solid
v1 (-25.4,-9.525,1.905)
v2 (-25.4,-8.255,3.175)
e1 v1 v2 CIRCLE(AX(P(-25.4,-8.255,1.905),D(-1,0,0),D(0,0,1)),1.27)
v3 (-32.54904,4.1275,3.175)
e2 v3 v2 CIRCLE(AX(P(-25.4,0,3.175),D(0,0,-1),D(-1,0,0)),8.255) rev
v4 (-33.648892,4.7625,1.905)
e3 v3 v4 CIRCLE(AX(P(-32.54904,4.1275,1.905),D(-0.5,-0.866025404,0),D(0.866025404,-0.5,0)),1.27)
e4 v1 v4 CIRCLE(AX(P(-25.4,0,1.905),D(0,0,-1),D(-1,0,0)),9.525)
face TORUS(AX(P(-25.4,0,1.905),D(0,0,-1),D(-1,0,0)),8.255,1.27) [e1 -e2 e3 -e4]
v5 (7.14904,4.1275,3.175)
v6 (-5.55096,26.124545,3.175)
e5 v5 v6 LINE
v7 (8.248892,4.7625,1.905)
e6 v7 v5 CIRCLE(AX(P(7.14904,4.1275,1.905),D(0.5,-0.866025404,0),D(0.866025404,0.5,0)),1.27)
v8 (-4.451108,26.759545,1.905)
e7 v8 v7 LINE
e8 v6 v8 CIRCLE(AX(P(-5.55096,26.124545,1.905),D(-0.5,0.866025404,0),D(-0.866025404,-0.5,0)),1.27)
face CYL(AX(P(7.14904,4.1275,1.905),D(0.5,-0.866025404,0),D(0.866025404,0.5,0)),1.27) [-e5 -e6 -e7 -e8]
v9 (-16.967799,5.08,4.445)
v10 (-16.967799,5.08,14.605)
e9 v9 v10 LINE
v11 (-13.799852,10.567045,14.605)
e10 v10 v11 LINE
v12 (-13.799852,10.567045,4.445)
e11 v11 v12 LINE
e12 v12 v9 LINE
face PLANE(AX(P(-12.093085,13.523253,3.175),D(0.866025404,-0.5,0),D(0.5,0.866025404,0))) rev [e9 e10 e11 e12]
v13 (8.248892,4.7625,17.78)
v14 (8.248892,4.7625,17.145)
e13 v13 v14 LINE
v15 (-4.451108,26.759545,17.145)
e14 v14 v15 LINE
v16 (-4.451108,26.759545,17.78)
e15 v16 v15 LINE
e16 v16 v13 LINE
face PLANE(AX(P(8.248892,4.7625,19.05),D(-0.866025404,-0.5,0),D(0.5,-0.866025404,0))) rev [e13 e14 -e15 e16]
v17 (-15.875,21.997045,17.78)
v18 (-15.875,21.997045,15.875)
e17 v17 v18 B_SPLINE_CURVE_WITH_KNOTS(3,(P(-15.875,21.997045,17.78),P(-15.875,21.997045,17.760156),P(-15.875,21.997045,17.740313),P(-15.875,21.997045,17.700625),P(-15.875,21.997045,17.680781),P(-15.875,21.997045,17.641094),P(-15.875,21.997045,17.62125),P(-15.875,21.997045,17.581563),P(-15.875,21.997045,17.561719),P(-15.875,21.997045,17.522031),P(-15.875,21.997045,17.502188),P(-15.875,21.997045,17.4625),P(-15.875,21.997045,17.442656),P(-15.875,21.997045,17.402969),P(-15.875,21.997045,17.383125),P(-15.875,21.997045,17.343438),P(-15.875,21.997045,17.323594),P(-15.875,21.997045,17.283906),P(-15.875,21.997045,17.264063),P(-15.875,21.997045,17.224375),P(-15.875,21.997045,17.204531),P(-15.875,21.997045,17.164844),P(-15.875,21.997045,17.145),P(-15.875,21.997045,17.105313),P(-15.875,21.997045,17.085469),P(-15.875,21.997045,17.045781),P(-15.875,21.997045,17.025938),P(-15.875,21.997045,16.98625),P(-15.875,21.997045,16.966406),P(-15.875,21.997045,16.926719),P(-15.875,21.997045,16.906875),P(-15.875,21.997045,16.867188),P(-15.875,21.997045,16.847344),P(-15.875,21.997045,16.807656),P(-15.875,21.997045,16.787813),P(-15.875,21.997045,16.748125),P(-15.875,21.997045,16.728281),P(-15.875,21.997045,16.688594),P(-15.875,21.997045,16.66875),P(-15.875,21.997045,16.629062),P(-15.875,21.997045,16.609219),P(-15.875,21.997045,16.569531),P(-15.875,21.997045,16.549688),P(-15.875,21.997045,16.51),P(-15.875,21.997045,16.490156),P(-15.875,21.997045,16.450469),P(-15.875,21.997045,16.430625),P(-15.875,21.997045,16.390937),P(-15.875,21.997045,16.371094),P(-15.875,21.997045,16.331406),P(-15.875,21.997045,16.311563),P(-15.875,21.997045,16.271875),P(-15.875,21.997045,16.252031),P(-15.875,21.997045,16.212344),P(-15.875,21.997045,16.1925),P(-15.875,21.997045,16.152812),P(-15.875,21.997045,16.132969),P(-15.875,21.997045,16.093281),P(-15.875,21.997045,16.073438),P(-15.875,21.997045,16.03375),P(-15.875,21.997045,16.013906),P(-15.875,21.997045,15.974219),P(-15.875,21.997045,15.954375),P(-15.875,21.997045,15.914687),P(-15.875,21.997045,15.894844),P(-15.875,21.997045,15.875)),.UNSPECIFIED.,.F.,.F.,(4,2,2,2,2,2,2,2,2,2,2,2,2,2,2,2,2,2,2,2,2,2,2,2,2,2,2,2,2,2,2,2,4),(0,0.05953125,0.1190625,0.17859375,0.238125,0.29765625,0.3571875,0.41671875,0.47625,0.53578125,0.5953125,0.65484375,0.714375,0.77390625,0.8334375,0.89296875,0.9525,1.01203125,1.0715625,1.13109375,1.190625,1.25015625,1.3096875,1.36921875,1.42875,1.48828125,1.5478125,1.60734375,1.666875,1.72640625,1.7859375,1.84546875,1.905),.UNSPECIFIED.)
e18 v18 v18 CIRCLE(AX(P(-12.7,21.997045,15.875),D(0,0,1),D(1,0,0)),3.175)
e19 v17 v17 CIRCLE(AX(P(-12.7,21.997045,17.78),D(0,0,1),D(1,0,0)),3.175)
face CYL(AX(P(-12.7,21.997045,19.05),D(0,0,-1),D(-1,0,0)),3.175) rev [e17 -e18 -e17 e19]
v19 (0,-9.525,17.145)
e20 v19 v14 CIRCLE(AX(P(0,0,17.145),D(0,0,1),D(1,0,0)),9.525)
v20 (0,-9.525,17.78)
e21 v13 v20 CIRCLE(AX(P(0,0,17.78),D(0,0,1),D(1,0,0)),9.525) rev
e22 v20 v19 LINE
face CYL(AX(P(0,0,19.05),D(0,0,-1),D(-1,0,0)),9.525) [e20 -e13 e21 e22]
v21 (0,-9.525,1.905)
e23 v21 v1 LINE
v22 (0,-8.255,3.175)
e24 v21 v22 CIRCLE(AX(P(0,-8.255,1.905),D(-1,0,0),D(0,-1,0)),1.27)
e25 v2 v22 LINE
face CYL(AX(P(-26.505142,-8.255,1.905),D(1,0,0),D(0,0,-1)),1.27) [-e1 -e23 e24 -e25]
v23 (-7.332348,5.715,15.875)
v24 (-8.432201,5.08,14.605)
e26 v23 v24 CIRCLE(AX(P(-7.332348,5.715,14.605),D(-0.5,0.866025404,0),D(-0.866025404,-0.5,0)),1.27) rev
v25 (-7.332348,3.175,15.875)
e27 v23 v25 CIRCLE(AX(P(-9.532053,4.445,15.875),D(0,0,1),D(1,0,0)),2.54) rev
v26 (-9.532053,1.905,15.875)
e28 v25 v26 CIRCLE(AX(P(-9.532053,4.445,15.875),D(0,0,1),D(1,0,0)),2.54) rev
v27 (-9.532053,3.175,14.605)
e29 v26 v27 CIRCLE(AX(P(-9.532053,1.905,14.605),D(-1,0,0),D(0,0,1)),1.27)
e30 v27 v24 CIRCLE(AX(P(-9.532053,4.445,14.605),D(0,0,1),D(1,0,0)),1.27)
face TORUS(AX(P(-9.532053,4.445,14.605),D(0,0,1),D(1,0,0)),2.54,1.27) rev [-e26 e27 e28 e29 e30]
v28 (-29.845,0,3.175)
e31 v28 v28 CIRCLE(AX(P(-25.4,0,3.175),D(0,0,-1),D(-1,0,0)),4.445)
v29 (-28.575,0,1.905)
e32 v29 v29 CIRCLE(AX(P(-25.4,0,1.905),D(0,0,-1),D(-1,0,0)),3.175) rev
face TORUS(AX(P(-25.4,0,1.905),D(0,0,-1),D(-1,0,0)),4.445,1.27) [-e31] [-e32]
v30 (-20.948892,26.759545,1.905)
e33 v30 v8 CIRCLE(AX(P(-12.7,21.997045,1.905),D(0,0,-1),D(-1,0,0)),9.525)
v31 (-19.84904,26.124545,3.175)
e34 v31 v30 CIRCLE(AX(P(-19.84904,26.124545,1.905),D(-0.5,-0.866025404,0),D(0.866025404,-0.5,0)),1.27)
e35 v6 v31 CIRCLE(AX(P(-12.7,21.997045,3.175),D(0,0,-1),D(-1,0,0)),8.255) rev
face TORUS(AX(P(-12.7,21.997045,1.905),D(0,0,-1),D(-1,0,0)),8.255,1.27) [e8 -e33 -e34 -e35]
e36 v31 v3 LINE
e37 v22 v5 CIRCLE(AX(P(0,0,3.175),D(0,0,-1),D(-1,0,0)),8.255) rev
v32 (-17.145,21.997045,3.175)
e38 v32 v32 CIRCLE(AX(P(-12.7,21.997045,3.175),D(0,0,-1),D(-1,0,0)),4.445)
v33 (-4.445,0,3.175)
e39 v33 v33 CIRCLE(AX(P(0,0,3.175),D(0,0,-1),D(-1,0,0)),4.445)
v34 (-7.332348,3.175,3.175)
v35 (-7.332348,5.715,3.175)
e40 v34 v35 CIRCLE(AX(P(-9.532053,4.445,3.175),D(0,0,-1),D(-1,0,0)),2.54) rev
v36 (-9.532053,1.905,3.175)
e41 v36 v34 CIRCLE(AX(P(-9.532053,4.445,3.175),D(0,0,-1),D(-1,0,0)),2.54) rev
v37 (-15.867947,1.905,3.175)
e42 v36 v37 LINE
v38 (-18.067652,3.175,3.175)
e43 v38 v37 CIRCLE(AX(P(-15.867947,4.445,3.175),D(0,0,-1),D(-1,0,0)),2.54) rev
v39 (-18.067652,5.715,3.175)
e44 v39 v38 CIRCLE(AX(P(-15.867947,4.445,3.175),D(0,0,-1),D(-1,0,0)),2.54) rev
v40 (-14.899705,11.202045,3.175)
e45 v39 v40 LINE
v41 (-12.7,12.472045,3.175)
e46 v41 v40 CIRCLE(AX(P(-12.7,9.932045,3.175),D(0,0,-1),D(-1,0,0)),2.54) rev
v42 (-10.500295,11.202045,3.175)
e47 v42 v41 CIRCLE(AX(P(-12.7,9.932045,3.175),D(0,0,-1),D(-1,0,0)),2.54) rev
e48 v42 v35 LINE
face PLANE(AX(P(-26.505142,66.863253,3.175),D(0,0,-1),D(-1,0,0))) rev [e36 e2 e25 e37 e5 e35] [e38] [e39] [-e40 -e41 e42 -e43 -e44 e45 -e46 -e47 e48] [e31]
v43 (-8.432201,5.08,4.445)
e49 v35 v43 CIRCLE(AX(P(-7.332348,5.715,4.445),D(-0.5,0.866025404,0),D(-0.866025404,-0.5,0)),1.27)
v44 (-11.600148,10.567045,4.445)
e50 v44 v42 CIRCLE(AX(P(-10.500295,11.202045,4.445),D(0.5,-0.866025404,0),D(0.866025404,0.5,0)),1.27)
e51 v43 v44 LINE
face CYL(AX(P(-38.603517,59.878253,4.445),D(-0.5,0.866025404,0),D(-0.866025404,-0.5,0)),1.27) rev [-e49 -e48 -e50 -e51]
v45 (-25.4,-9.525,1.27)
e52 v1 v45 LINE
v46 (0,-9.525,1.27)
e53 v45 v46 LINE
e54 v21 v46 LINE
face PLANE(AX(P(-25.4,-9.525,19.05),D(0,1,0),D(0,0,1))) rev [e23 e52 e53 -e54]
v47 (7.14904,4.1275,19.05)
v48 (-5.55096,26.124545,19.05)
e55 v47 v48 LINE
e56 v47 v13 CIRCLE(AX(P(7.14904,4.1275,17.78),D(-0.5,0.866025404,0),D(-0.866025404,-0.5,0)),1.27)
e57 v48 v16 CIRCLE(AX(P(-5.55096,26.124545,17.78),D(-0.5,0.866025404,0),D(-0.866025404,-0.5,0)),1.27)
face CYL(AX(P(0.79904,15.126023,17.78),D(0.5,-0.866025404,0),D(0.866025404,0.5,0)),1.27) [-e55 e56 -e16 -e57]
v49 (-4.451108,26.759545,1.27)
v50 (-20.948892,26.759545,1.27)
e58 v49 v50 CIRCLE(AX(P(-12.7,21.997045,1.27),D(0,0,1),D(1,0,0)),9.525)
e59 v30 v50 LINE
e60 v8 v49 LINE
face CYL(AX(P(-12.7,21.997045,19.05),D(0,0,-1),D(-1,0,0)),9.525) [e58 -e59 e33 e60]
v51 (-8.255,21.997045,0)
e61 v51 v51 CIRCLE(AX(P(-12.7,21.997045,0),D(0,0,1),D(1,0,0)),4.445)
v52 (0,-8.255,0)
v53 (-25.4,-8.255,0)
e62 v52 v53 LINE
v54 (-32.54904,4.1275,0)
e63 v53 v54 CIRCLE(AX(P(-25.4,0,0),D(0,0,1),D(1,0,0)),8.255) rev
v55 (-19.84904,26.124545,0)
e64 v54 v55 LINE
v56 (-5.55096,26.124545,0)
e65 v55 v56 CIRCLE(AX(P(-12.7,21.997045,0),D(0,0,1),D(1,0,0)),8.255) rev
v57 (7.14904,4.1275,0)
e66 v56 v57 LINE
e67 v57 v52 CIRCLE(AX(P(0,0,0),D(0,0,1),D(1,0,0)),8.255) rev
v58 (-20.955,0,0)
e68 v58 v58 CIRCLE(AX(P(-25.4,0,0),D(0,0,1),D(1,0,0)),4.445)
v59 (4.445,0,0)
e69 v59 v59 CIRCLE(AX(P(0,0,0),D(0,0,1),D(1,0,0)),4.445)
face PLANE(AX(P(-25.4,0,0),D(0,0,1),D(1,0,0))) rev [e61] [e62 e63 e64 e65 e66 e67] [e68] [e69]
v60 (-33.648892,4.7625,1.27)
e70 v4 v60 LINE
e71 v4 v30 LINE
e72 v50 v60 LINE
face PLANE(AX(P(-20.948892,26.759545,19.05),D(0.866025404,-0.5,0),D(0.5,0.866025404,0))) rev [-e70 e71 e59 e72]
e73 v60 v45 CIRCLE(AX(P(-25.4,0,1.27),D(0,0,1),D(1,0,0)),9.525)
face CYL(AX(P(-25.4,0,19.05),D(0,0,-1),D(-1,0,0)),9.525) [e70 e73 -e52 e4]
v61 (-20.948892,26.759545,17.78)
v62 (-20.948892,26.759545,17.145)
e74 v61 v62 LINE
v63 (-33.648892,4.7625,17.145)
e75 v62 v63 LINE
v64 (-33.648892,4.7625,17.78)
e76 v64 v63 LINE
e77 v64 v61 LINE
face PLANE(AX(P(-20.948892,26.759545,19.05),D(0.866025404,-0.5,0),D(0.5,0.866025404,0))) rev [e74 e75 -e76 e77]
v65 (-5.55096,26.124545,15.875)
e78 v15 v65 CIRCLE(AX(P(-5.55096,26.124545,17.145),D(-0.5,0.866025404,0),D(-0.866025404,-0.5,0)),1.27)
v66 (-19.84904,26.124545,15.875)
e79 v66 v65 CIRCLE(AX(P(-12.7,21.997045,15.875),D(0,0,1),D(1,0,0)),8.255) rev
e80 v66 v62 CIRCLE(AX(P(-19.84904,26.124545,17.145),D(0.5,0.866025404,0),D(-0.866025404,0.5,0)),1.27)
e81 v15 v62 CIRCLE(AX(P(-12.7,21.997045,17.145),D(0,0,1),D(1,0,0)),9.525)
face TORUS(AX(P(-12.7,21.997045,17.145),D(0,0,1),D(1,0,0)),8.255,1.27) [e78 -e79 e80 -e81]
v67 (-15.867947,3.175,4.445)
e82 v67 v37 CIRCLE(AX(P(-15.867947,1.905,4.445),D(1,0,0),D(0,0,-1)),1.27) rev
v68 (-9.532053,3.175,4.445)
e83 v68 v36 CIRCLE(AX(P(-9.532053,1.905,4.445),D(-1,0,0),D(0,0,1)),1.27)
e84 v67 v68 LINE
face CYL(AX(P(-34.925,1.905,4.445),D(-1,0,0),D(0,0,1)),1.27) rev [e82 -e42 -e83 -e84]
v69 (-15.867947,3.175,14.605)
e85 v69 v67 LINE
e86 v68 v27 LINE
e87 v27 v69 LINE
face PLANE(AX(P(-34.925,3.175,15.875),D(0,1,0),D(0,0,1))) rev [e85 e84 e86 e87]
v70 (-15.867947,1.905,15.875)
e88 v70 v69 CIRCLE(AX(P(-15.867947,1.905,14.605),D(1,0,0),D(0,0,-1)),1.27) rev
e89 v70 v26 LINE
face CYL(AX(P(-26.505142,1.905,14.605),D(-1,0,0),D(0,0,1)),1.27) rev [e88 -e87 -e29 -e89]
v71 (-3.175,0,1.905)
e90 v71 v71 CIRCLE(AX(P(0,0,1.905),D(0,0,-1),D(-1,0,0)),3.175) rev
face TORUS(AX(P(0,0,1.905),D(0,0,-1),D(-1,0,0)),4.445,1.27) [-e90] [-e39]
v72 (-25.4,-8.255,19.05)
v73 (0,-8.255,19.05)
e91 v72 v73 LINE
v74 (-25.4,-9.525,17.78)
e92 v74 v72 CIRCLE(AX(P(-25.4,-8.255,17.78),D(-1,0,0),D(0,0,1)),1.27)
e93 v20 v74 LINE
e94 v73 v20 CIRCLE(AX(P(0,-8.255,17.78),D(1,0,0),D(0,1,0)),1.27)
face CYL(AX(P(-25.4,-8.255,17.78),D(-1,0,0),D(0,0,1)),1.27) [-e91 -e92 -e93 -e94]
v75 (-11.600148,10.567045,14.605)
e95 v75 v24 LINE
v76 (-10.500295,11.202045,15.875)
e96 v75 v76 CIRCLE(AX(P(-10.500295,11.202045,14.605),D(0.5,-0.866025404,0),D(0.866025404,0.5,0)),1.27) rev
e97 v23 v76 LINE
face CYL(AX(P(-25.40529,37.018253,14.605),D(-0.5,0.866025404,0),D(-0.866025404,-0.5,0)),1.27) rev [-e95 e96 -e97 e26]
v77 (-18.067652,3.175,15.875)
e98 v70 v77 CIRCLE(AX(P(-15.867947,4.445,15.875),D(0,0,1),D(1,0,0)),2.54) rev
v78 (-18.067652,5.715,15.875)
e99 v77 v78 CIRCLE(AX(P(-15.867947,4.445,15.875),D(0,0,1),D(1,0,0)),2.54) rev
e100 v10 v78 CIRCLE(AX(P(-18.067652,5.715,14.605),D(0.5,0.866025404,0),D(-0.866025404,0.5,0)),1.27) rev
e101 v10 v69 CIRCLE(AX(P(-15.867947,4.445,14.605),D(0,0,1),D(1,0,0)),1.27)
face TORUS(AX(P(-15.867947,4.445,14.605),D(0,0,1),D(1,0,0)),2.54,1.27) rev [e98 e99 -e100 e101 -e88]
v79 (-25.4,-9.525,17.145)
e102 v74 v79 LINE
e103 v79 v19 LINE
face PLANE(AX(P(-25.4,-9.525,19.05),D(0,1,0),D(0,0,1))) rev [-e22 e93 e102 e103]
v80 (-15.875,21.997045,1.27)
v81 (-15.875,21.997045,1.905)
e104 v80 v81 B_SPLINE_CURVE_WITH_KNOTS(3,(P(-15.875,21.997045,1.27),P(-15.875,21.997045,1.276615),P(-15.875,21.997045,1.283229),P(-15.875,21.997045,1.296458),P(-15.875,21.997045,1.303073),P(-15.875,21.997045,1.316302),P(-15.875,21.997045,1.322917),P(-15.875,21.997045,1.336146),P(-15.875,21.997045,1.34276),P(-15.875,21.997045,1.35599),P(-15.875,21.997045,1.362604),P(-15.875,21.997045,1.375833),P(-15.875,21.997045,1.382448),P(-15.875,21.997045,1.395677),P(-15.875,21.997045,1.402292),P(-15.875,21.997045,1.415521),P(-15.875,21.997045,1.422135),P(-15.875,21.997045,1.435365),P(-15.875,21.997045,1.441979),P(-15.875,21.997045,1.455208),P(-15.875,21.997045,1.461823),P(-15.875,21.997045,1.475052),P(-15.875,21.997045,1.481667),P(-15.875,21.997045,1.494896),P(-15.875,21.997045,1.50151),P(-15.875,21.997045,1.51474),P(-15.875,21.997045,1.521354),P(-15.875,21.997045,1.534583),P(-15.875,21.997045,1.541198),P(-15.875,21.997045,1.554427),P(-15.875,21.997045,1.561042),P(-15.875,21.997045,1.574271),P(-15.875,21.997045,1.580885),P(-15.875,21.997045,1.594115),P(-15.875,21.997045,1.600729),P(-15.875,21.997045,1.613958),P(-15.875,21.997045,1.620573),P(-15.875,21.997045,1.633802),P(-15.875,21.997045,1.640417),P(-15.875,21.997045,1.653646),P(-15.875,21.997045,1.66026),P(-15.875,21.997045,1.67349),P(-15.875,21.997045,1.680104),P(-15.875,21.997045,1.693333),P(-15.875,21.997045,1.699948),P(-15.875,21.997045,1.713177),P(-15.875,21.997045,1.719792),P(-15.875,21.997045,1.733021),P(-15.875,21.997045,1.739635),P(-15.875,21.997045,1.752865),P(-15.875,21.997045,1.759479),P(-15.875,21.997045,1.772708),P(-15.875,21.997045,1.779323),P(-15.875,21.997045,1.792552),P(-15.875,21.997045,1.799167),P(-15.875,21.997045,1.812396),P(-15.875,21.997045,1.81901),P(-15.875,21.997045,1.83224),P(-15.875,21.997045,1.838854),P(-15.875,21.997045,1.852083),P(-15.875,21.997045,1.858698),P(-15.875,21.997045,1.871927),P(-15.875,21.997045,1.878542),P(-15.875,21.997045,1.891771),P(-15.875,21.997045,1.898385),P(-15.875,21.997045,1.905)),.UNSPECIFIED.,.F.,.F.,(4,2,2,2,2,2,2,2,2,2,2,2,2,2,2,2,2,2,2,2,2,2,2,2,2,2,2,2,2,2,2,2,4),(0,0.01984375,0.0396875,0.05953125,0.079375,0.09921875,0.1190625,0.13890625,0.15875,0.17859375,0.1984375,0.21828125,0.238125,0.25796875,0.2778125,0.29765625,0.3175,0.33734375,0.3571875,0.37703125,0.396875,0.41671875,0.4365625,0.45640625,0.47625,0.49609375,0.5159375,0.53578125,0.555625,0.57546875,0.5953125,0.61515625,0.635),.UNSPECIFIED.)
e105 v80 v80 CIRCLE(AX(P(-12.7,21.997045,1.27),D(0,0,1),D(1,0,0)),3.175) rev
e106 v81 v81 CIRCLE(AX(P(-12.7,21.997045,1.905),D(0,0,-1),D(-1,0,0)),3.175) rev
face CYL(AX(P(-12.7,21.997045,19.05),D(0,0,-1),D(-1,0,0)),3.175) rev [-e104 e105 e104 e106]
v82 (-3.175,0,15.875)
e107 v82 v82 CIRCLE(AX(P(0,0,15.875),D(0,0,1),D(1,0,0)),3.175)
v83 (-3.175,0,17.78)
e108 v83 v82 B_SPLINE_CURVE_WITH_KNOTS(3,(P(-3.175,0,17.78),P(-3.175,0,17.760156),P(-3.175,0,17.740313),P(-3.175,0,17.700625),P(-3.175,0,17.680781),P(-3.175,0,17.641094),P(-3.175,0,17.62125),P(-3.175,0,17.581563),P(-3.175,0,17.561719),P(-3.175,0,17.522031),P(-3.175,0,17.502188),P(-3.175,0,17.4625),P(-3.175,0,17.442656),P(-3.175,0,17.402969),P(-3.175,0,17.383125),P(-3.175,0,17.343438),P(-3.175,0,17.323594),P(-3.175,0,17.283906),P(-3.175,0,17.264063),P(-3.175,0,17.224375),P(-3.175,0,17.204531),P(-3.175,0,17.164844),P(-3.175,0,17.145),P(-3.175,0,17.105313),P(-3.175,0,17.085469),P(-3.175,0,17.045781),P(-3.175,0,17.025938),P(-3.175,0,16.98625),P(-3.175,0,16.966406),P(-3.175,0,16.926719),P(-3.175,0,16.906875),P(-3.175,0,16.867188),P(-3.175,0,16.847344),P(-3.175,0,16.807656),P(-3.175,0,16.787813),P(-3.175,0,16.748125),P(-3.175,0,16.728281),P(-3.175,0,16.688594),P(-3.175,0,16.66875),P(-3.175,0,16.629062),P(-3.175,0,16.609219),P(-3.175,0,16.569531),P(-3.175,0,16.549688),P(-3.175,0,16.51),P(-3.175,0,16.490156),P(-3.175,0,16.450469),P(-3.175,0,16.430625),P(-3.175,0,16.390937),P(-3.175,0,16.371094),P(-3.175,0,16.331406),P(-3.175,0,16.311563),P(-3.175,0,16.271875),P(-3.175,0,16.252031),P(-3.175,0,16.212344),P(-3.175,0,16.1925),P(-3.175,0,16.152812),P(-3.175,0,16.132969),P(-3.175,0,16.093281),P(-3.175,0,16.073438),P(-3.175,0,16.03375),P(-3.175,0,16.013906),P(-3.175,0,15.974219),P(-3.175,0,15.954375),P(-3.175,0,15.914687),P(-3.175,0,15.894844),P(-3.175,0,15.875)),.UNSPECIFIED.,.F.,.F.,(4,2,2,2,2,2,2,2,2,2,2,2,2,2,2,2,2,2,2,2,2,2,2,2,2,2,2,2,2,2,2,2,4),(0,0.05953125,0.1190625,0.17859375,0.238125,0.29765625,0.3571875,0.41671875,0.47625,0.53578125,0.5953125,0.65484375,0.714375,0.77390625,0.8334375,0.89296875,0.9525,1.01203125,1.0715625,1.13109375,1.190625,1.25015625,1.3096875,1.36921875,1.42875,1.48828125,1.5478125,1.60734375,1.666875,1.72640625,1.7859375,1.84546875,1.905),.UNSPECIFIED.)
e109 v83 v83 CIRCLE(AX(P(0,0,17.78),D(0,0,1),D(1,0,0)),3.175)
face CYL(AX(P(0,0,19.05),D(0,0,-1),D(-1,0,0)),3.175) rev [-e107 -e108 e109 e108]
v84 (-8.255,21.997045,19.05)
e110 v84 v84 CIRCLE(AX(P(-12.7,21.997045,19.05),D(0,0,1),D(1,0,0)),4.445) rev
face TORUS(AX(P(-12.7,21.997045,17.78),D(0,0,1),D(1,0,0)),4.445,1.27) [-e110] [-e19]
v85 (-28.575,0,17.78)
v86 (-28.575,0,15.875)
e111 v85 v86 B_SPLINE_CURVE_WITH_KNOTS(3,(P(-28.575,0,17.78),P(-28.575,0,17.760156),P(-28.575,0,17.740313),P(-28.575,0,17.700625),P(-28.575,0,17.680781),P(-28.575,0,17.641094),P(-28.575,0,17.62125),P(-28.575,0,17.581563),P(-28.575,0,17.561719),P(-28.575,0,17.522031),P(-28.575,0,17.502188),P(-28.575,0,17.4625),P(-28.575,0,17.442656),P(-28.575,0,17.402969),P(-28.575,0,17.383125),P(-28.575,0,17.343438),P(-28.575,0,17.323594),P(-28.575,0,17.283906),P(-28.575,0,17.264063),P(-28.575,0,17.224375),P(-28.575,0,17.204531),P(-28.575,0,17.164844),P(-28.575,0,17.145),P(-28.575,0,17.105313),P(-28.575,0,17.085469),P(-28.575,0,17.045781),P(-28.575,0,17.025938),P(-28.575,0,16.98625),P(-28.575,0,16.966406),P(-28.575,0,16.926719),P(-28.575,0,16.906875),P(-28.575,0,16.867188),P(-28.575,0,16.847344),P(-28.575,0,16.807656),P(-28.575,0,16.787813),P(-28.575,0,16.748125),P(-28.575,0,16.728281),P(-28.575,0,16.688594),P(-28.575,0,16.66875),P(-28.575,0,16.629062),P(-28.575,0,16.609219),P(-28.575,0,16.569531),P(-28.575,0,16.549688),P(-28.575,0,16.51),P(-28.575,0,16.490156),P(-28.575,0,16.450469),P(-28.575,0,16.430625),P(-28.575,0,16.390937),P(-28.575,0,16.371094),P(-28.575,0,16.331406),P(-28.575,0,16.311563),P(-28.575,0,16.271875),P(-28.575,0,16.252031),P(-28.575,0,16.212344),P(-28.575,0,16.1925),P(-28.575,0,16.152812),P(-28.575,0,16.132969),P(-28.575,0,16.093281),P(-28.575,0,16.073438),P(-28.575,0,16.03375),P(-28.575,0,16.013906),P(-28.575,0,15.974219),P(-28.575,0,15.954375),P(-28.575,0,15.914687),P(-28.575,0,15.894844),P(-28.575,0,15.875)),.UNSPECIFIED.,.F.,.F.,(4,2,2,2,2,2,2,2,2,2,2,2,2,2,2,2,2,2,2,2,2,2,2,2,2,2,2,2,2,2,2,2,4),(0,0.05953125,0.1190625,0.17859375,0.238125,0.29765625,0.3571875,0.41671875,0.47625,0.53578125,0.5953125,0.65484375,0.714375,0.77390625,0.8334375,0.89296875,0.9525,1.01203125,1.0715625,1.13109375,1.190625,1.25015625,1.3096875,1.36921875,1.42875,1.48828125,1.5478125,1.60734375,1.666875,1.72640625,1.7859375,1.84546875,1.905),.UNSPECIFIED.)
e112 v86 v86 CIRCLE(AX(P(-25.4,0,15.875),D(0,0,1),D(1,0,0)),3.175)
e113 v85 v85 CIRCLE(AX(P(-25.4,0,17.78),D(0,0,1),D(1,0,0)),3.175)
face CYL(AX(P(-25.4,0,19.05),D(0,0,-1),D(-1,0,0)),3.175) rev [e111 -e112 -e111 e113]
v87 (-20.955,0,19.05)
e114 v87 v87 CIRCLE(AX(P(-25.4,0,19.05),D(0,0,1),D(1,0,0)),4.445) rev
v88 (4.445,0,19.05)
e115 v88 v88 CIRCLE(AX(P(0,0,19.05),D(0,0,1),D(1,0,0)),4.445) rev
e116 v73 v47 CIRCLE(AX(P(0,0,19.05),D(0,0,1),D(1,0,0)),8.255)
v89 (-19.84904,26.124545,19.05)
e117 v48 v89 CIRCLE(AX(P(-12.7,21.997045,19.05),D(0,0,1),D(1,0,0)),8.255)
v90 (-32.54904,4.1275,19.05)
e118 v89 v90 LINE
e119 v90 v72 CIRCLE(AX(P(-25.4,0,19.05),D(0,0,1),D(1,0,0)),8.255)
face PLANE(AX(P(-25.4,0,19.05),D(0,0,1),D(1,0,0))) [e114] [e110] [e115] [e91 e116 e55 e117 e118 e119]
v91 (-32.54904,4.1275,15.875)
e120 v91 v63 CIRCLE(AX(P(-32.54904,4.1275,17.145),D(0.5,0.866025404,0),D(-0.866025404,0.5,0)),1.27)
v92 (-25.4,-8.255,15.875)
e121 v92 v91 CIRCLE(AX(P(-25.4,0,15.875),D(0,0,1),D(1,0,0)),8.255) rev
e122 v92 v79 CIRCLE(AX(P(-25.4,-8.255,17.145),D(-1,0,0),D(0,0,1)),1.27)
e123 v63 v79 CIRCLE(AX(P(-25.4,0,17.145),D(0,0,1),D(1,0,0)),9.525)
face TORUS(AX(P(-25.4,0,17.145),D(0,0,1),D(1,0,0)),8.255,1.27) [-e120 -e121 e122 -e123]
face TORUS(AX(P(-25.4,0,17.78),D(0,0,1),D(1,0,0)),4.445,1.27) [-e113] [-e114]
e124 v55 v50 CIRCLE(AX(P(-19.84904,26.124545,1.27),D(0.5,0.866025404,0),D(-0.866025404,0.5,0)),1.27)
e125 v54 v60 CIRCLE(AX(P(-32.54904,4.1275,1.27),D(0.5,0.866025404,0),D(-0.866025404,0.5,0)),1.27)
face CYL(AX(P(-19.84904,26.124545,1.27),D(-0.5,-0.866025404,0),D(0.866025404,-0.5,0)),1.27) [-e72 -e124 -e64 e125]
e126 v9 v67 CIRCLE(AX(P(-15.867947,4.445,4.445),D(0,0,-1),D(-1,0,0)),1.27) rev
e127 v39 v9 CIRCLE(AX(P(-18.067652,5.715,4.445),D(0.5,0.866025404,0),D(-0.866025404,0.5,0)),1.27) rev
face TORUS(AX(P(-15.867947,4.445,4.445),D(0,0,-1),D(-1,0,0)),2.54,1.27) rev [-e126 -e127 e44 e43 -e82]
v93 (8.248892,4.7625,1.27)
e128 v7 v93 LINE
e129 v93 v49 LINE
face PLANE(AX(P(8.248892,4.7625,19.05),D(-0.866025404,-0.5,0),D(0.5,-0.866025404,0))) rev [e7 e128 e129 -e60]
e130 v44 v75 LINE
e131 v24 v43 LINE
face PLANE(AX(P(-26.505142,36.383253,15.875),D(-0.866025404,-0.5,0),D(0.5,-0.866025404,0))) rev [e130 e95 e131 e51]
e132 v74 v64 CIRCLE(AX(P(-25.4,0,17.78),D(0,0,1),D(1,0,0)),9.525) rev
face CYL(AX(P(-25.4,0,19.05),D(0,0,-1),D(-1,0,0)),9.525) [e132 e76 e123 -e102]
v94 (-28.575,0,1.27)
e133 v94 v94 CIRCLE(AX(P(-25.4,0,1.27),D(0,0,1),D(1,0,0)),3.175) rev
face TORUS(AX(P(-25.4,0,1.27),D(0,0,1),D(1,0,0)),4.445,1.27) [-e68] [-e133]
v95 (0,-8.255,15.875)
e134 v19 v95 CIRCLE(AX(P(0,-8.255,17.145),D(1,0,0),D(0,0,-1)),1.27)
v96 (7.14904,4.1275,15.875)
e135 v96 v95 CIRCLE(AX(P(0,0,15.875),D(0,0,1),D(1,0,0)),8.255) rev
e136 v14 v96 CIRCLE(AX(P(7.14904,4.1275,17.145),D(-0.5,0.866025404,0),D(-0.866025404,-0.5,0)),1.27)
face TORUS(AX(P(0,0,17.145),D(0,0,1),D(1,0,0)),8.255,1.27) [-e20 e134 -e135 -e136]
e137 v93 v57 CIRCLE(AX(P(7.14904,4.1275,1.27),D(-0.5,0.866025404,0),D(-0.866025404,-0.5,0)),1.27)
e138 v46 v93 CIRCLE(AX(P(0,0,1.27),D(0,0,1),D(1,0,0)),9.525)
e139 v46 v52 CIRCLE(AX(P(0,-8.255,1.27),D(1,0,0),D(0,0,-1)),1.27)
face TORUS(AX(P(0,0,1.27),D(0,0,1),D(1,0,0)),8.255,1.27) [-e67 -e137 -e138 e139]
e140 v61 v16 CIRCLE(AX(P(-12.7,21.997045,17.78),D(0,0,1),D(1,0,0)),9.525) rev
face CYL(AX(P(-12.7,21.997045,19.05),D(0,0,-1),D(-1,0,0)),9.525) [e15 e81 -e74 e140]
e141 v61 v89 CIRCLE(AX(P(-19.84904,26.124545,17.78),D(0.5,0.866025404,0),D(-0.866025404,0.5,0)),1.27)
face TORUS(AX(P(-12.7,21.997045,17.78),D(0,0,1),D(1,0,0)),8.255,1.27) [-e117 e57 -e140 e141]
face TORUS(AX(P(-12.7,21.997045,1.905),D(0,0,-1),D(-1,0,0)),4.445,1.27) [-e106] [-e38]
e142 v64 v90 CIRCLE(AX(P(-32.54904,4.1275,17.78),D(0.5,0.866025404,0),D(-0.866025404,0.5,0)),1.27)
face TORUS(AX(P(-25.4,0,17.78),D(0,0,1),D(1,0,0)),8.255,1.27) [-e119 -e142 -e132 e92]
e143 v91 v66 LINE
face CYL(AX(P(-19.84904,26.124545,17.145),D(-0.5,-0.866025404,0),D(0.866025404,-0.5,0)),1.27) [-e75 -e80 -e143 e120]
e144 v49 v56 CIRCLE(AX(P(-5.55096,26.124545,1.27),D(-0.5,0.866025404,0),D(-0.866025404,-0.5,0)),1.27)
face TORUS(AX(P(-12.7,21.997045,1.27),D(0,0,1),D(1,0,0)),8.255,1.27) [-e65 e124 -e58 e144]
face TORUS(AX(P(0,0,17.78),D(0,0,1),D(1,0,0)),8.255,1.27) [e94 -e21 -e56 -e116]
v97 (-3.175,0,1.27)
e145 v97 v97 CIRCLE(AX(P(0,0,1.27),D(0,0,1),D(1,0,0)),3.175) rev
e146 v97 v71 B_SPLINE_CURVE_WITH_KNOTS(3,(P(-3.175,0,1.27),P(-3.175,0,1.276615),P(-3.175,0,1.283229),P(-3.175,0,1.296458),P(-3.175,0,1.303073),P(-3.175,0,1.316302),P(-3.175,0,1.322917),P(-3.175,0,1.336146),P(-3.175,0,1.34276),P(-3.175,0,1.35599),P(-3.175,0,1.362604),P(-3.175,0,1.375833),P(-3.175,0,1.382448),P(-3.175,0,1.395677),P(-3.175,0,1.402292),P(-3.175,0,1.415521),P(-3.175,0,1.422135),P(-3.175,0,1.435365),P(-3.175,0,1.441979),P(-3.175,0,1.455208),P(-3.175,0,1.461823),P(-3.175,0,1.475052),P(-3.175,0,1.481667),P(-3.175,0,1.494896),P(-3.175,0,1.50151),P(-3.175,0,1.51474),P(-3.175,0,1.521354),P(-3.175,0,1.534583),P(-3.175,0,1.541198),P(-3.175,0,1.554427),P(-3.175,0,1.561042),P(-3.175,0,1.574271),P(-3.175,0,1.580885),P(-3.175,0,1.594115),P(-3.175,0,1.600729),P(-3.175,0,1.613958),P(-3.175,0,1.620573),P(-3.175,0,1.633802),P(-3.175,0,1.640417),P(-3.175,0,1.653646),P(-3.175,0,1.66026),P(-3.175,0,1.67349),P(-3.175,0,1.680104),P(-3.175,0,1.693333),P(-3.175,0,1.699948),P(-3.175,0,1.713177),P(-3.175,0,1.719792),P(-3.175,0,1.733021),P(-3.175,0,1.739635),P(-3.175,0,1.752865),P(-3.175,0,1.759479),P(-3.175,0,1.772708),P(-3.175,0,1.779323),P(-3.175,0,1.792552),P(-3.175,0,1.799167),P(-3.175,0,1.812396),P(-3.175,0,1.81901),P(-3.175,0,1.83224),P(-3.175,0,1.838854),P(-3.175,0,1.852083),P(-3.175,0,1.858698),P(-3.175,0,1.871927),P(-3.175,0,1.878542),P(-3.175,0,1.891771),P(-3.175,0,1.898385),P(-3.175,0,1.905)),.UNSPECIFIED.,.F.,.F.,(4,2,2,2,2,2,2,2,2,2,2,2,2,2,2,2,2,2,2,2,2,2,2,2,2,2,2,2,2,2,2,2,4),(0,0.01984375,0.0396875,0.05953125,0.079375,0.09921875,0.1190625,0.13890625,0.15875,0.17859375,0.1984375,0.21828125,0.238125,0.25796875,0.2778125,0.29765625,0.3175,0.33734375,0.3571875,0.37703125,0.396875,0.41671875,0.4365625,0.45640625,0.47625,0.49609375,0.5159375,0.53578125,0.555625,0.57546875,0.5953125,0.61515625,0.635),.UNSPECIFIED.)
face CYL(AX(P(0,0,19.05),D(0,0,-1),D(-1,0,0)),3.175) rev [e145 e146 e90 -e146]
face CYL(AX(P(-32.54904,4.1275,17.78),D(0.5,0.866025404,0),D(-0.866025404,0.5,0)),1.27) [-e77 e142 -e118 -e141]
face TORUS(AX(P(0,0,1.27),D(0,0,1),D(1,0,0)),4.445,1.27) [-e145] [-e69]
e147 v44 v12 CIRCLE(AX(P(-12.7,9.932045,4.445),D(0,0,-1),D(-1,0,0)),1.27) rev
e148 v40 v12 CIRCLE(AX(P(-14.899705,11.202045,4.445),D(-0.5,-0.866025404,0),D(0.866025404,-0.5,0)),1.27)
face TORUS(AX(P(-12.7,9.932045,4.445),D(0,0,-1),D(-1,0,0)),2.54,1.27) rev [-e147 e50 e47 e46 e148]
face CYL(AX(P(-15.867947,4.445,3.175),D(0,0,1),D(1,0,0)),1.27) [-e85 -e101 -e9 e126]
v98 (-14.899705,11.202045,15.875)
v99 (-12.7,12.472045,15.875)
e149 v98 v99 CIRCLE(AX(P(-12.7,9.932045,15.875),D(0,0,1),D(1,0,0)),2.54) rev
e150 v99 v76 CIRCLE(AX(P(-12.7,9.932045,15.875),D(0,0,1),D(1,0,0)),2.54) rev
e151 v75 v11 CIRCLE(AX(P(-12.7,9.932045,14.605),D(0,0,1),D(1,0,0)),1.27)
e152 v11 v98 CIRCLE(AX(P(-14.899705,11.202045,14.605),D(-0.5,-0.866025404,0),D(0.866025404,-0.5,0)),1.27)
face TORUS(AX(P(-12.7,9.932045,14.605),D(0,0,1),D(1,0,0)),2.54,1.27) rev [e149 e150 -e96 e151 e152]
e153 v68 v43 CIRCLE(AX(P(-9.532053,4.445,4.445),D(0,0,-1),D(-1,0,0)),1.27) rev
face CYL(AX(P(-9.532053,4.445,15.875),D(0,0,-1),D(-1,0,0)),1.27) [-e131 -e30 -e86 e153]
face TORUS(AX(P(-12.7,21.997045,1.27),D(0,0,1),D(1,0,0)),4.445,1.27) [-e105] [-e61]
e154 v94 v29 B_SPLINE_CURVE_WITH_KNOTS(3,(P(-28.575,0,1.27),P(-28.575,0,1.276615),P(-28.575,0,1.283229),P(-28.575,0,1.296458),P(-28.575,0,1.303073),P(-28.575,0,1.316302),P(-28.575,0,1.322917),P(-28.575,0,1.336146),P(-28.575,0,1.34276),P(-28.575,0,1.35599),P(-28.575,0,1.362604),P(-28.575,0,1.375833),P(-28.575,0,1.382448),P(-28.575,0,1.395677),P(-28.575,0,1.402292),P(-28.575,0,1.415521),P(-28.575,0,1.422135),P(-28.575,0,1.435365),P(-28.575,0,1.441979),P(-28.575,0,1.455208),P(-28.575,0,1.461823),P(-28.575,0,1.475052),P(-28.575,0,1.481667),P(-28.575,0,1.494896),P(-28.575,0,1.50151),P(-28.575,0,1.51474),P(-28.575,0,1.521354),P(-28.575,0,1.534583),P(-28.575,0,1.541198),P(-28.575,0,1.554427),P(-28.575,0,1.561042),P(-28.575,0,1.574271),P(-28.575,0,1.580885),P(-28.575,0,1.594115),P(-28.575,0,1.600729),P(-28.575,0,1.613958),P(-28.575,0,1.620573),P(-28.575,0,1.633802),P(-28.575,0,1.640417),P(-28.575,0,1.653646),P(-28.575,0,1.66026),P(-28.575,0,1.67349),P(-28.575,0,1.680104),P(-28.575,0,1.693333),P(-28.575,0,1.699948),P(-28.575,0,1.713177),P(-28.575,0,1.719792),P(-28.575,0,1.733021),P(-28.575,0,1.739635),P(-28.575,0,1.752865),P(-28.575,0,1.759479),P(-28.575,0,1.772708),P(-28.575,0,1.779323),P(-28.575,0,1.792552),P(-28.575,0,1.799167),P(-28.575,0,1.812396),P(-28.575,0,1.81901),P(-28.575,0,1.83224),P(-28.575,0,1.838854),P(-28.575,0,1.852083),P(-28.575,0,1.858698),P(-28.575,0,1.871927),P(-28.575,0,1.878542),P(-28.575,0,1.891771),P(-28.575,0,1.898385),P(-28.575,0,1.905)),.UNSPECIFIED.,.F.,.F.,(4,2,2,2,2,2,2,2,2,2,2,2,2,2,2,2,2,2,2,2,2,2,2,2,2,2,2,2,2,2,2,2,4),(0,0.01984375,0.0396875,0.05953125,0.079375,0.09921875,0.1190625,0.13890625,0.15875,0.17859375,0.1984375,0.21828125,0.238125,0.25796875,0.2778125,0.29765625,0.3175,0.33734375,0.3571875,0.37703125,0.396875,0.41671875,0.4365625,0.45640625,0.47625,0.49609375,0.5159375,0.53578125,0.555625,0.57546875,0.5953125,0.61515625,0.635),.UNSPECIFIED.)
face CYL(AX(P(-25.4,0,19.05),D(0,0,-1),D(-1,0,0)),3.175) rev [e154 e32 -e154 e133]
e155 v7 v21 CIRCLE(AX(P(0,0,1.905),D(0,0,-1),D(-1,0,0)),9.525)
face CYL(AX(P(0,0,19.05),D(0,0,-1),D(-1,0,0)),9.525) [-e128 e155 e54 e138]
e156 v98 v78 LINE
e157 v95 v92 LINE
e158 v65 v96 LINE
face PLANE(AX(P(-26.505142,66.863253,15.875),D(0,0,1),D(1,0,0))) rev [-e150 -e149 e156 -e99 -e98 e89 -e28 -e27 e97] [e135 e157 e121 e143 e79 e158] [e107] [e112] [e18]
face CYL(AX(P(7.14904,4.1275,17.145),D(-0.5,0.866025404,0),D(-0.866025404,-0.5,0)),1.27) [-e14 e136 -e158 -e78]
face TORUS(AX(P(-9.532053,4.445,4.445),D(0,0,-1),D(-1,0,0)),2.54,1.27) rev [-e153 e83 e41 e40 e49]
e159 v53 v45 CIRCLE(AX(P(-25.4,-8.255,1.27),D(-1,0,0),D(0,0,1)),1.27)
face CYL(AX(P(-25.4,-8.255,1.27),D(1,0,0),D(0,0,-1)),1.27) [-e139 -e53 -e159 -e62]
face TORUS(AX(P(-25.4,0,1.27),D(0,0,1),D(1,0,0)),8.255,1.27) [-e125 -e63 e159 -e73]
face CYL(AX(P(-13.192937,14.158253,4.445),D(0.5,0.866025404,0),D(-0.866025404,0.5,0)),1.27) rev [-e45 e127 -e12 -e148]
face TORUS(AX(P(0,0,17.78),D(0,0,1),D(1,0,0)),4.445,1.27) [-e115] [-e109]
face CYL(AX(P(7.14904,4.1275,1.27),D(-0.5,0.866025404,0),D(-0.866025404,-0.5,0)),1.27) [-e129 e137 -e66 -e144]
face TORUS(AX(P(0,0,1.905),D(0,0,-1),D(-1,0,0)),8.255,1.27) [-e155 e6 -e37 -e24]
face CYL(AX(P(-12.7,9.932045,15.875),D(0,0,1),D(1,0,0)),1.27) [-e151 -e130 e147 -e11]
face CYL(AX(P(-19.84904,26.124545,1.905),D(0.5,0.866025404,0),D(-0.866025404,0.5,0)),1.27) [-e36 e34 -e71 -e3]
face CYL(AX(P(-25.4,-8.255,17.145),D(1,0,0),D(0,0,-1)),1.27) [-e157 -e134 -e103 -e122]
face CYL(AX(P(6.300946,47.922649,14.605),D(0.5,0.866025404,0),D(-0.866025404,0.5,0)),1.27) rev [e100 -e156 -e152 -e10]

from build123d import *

# Parameters (mm, degrees)
SKETCH1_R               = 3.175
BOSS_EXTRUDE1_DEPTH     = 19.05
FILLET1_R               = 1.27
CUT_EXTRUDE1_START      = -4.7625
CUT_EXTRUDE1_OUTLINE_W  = 47
CUT_EXTRUDE1_OUTLINE_H  = 12.7
CUT_EXTRUDE1_DEPTH      = 14.2875
CUT_EXTRUDE2_START      = 3.175
CUT_EXTRUDE2_OUTLINE_R  = 3.175
CUT_EXTRUDE2_DEPTH      = 12.7
CUT_EXTRUDE3_DEPTH      = 51.757240559
CUT_EXTRUDE3_DEPTH_BACK = 51.757240559
SKETCH4_W               = 12.7
SKETCH4_H               = 12.7
FILLET2_R               = 1.27


# Read off the part's stored shape, not the designer's step: Cut-Extrude1, Cut-Extrude2
with BuildPart() as part:
    # Sketch1 → Boss-Extrude1 (new body)
    with BuildSketch(Plane.XY):
        with BuildLine():
            Line((-20.948891971, 26.759545256), (-33.648891971, 4.7625))
            ThreePointArc((-33.648891971, 4.7625), (-33.648891971, -4.7625), (-25.4, -9.525))
            Line((-25.4, -9.525), (0, -9.525))
            ThreePointArc((0, -9.525), (8.248891971, -4.7625), (8.248891971, 4.7625))
            Line((8.248891971, 4.7625), (-4.451108029, 26.759545256))
            ThreePointArc((-4.451108029, 26.759545256), (-12.7, 31.522045256), (-20.948891971, 26.759545256))
        make_face()
        with Locations(Location((-25.4, 0, 0), (0, 0, 180))):
            Circle(SKETCH1_R, mode=Mode.SUBTRACT)
        with Locations(Location((0, 0, 0), (0, 0, 180))):
            Circle(SKETCH1_R, mode=Mode.SUBTRACT)
        with Locations(Location((-12.7, 21.997045256, 0), (0, 0, 180))):
            Circle(SKETCH1_R, mode=Mode.SUBTRACT)
    extrude(amount=BOSS_EXTRUDE1_DEPTH)

    # Fillet1
    fillet1_edges = [part.edges().sort_by_distance(p)[0] for p in [
        (8.248891971, -4.7625, 19.05),
        (1.898891971, 15.761022628, 19.05),
        (-12.7, 31.522045256, 19.05),
        (-27.298891971, 15.761022628, 19.05),
        (-33.648891971, -4.7625, 19.05),
        (-27.298891971, 15.761022628, 0),
        (-12.7, 31.522045256, 0),
        (1.898891971, 15.761022628, 0),
        (8.248891971, -4.7625, 0),
        (-12.7, -9.525, 0),
        (-33.648891971, -4.7625, 0),
        (-12.7, -9.525, 19.05),
    ]]
    fillet(fillet1_edges, radius=FILLET1_R)

    # Cut-Extrude1 outline → Cut-Extrude1 (cut)
    with BuildSketch(Plane(origin=(0, 0, 0), x_dir=(0.500000000000004, -0.8660254037844363, 0), z_dir=(0.8660254037844363, 0.5000000000000042, 0)).offset(CUT_EXTRUDE1_START)):
        with Locations((-12.5, -9.525)):
            Rectangle(CUT_EXTRUDE1_OUTLINE_W, CUT_EXTRUDE1_OUTLINE_H)
    extrude(amount=CUT_EXTRUDE1_DEPTH, mode=Mode.SUBTRACT)

    # Cut-Extrude2 outline → Cut-Extrude2 (cut)
    with BuildSketch(Plane.XY.offset(CUT_EXTRUDE2_START)):
        with BuildLine():
            ThreePointArc((-33.648891971, 4.7625), (-33.648891971, -4.7625), (-25.4, -9.525))
            Line((-25.4, -9.525), (-12.7, 12.472045256))
            Line((-12.7, 12.472045256), (-20.948891971, 26.759545256))
            Line((-20.948891971, 26.759545256), (-33.648891971, 4.7625))
        make_face()
        with Locations((-25.4, 0)):
            Circle(CUT_EXTRUDE2_OUTLINE_R, mode=Mode.SUBTRACT)
    extrude(amount=CUT_EXTRUDE2_DEPTH, mode=Mode.SUBTRACT)

    # Sketch4 → Cut-Extrude3 (cut, two sides: drawn at the far end of the back side and taken through both)
    with BuildSketch(Plane(origin=(-25.4, 0, 0), x_dir=(0, 0, -1), z_dir=(1, 0, 0)).offset(-CUT_EXTRUDE3_DEPTH_BACK)):
        with Locations((-9.525, -3.175)):
            Rectangle(SKETCH4_W, SKETCH4_H)
    extrude(amount=CUT_EXTRUDE3_DEPTH + CUT_EXTRUDE3_DEPTH_BACK, mode=Mode.SUBTRACT)

    # Fillet2
    fillet2_edges = [part.edges().sort_by_distance(p)[0] for p in [
        (-22.225, 0, 3.175),
        (-15.383825791, 7.823522628, 3.175),
        (-33.648891971, -4.7625, 3.175),
        (-27.298891971, 15.761022628, 3.175),
        (-27.298891971, 15.761022628, 15.875),
        (-33.648891971, -4.7625, 15.875),
        (-15.383825791, 7.823522628, 15.875),
        (-12.7, 12.472045256, 9.525),
        (-18.067651581, 3.175, 9.525),
        (-12.7, 3.175, 15.875),
        (-7.332348419, 3.175, 9.525),
        (-12.7, 3.175, 3.175),
        (-12.7, -9.525, 3.175),
        (-12.7, -9.525, 15.875),
        (-22.225, 0, 0),
        (-22.225, 0, 19.05),
        (3.175, 0, 0),
        (3.175, 0, 19.05),
        (-9.525, 21.997045256, 0),
        (-9.525, 21.997045256, 19.05),
        (8.248891971, -4.7625, 15.875),
        (1.898891971, 15.761022628, 15.875),
        (-12.7, 31.522045256, 15.875),
        (1.898891971, 15.761022628, 3.175),
        (8.248891971, -4.7625, 3.175),
        (-12.7, 31.522045256, 3.175),
        (3.175, 0, 3.175),
        (-9.525, 21.997045256, 3.175),
        (-10.016174209, 7.823522628, 3.175),
        (-10.016174209, 7.823522628, 15.875),
    ]]
    fillet(fillet2_edges, radius=FILLET2_R)


solid = part.part
